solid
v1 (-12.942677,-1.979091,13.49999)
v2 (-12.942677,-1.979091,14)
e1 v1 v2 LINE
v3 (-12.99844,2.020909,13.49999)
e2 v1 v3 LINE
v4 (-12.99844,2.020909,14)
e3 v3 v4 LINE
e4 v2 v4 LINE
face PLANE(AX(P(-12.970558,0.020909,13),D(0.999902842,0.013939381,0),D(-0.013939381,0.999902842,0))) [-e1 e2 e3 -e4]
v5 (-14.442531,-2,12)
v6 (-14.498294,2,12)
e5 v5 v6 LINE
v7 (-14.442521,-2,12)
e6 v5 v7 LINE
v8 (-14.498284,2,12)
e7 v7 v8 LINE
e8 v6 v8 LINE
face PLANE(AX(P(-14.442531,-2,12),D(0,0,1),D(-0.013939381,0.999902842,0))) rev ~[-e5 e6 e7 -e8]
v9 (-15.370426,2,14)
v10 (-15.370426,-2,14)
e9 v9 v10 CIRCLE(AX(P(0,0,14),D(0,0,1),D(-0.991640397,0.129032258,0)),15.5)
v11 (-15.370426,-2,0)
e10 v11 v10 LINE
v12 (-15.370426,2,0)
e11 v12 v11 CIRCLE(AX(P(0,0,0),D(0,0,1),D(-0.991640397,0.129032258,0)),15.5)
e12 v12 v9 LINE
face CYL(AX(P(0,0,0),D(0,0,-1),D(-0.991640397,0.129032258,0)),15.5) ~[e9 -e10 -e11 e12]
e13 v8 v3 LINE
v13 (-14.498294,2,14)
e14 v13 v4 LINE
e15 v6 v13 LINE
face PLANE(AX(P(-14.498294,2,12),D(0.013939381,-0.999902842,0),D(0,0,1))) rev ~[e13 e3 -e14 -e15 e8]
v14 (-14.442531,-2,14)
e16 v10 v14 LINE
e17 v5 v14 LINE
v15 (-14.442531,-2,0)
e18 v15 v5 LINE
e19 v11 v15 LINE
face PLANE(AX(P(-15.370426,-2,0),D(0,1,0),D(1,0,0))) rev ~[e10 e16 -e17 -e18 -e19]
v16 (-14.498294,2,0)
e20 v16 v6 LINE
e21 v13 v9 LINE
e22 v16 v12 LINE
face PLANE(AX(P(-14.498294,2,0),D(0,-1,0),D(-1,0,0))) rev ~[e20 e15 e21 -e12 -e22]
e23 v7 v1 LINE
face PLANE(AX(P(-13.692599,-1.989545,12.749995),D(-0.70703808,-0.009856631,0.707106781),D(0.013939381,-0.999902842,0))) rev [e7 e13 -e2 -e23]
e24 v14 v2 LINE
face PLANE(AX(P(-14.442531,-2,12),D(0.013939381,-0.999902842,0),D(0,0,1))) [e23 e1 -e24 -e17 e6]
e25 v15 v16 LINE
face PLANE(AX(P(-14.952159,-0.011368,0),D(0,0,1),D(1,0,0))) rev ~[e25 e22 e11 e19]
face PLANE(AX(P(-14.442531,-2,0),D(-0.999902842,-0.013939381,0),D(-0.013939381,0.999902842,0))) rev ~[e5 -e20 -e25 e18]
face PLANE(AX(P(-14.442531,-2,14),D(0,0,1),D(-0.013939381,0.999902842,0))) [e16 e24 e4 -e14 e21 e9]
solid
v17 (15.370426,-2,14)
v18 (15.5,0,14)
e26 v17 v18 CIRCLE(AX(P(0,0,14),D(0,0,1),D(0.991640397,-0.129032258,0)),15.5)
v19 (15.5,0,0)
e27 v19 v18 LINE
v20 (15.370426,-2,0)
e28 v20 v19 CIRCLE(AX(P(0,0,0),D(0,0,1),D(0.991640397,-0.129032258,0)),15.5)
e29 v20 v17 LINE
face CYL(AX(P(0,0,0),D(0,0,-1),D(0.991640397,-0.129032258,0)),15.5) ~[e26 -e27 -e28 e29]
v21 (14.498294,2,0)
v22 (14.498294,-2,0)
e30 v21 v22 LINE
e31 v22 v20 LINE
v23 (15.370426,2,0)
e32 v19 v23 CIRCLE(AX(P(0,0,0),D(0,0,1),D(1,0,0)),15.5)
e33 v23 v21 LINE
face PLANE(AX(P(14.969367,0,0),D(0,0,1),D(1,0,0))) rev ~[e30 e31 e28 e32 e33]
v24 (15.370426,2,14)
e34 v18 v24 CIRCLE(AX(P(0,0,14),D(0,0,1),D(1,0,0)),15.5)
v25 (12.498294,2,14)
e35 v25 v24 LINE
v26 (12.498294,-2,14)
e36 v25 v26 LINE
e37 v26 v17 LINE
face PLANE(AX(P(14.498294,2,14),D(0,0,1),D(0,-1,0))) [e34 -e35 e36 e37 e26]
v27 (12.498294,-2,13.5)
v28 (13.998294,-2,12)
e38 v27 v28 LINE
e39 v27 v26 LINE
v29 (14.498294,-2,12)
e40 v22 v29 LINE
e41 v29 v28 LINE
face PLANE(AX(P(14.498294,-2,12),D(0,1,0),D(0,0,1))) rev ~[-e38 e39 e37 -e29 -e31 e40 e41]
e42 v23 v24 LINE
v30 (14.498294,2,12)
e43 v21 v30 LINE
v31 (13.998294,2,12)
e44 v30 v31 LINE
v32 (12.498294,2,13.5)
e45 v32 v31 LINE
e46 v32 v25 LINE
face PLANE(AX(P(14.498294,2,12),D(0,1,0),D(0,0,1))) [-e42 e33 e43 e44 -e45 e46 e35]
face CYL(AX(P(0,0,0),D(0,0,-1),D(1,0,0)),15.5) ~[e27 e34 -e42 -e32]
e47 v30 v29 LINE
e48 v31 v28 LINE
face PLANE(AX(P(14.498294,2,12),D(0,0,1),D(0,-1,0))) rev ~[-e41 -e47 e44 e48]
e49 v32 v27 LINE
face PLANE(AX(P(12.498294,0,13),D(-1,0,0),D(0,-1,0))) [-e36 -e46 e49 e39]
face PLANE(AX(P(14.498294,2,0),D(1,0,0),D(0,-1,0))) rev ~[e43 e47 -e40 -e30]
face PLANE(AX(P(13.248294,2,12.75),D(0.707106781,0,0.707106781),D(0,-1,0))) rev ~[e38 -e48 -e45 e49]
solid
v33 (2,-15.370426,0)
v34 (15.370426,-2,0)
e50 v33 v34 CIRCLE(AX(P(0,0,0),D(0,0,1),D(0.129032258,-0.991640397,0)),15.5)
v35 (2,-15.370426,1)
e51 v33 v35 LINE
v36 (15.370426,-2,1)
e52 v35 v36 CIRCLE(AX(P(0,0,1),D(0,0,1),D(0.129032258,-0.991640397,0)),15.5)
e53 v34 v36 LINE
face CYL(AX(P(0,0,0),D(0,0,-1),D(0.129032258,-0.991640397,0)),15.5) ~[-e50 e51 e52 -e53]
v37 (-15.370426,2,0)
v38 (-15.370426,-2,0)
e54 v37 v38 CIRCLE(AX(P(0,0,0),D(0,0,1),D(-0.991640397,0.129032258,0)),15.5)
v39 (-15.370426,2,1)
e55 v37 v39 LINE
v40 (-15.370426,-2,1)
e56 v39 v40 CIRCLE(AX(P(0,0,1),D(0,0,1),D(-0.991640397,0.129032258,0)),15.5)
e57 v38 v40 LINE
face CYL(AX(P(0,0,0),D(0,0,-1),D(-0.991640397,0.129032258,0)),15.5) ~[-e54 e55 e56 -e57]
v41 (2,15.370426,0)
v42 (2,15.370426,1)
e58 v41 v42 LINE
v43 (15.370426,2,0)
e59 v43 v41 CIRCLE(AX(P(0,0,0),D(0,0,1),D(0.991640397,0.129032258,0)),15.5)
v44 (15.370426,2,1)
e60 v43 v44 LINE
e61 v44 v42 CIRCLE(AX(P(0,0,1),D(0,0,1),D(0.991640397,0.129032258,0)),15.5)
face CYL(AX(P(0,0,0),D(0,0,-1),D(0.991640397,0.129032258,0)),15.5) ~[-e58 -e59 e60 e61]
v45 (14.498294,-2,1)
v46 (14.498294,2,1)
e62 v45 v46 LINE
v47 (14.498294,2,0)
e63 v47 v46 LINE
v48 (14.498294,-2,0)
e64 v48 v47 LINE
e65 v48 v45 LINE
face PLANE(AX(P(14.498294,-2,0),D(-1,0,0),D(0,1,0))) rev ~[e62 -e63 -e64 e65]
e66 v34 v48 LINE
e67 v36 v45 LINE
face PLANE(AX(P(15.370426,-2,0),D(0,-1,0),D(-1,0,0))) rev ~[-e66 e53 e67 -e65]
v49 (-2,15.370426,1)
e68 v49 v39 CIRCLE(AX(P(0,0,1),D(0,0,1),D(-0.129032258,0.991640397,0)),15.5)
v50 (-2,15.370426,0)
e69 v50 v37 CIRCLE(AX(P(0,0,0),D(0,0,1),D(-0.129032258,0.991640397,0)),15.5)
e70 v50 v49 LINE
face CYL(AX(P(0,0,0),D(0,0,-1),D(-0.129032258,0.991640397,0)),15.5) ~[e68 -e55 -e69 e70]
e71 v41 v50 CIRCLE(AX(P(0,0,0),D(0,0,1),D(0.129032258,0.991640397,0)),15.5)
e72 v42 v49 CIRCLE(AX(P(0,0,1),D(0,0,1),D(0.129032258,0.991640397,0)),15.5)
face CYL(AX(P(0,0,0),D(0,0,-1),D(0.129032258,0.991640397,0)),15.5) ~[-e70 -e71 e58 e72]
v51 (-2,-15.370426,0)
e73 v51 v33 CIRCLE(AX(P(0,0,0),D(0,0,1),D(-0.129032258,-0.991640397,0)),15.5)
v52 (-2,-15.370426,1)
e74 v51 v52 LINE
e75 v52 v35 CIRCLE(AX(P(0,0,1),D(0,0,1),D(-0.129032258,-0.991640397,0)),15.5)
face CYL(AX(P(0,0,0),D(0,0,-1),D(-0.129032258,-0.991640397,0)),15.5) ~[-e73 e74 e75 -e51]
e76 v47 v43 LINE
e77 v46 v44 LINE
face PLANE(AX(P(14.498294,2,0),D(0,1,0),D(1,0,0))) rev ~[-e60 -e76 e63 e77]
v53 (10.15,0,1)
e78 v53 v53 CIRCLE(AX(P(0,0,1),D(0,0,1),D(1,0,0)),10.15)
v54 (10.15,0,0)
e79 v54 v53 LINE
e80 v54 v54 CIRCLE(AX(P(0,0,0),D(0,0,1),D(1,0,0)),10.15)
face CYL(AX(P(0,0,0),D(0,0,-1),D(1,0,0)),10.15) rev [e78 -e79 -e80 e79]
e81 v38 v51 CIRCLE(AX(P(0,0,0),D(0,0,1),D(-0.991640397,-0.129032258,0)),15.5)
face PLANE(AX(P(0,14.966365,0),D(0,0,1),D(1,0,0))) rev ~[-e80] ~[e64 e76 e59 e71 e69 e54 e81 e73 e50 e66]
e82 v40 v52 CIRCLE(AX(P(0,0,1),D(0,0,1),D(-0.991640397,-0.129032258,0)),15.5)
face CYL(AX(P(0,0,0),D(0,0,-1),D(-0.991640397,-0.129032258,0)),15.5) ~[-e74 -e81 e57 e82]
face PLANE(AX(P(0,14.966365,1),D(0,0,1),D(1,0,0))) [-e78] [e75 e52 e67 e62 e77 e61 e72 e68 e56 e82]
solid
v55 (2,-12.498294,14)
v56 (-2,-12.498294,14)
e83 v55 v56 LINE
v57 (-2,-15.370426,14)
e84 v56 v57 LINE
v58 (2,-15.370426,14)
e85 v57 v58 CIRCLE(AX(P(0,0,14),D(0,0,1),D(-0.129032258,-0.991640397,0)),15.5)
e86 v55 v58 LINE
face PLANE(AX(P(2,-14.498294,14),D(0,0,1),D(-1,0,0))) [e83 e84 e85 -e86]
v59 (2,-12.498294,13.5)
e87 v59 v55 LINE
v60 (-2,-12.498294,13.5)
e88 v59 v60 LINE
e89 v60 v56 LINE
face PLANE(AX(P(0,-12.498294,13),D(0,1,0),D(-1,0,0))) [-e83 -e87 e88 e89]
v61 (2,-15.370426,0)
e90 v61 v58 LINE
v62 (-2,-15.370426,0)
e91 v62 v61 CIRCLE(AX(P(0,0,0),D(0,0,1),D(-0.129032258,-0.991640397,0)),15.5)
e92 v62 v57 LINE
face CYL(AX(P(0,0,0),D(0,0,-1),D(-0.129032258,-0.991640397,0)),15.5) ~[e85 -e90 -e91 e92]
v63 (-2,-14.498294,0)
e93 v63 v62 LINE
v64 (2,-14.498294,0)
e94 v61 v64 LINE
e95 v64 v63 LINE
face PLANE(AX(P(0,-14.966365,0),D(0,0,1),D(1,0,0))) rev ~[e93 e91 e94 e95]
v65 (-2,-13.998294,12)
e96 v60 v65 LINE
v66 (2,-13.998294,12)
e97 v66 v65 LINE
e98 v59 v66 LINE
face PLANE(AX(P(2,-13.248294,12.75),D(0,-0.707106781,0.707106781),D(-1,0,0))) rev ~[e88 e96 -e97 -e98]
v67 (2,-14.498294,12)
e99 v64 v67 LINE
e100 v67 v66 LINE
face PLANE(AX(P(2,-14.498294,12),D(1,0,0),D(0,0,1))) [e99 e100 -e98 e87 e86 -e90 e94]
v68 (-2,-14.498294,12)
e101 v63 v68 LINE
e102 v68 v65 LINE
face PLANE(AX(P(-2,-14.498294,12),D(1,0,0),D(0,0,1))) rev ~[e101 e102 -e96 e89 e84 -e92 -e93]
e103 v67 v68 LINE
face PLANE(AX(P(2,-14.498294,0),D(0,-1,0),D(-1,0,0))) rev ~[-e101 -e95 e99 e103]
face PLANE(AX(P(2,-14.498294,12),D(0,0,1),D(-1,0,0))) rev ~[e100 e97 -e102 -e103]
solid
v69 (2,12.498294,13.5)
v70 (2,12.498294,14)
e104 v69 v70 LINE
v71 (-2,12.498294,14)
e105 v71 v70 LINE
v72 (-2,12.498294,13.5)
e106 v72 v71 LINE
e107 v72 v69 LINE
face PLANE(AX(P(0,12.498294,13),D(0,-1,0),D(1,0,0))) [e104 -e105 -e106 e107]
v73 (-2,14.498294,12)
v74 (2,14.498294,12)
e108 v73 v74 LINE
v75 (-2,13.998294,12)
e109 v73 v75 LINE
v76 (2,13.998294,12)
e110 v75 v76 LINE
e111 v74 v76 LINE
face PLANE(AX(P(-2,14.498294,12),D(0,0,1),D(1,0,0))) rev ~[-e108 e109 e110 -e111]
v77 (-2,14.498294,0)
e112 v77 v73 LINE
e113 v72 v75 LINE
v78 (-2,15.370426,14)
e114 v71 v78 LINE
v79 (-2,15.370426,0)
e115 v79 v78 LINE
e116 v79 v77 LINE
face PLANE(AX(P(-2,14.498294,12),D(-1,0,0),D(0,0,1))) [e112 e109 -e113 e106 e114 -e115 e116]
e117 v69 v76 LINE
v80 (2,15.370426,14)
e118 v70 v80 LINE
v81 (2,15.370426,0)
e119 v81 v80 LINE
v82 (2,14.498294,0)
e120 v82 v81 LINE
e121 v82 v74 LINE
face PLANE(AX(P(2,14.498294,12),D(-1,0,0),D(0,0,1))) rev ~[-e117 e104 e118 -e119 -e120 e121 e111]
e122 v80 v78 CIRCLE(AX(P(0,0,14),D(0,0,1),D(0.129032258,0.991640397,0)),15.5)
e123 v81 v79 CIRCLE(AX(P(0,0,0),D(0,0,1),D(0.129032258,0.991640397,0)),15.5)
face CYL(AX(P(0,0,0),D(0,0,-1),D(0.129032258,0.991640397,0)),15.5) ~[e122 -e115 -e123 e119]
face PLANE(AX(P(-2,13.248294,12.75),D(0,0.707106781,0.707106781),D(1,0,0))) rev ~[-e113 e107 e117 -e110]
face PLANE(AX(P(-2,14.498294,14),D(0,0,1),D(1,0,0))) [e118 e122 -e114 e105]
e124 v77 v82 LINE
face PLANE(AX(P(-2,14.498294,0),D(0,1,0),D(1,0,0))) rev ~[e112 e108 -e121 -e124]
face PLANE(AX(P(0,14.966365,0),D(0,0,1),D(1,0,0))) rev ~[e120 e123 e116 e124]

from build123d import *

# Parameters (mm, degrees)
F1_DEPTH  = 14
F0_R      = 10.15
F2_DEPTH  = 1
F3_W      = 4
F3_H      = 2
F4_DEPTH  = 2
F5_SIZE   = 1.5
F6_W      = 4
F6_H      = 2
F7_DEPTH  = 2
F8_SIZE   = 1.5
F9_W      = 4.0003886693
F9_H      = 2
F10_DEPTH = 1.5
F11_SIZE  = 1.49999
F12_W     = 4
F12_H     = 2
F13_DEPTH = 2
F14_SIZE  = 1.5


# Not quite as in the source:
# - a fillet or chamfer is up to 0.001 mm smaller than in the source, because OpenCascade refuses the exact size
# - a feature names something its author has since deleted; it is built from what else it names


with BuildPart() as f1:
    # F0 (on Top) → F1 (new body)
    with BuildSketch(Plane.XY):
        with BuildLine():
            Line((-14.4982938511, 2), (-15.3704261489, 2))
            ThreePointArc((-15.3704261489, 2), (-15.5, 0), (-15.3704261489, -2))
            Line((-15.3704261489, -2), (-14.4425309095, -2))
            Line((-14.4425309095, -2), (-14.4982938511, 2))
        make_face()
    extrude(amount=F1_DEPTH)

    # F9 (on face) → F10 (join)
    with BuildSketch(Plane(origin=(-14.4676006874, -0.2016889929, 0), x_dir=(-0.0139393809, 0.9999028421, 0), z_dir=(0.9999028421, 0.0139393809, 0))):
        with Locations((0.2017085905, 13)):
            Rectangle(F9_W, F9_H)
    extrude(amount=F10_DEPTH)

    # F11 (size 1.5 in the source; OpenCascade refuses exactly that, so slightly less here)
    f11_edges = [f1.edges().sort_by_distance(p)[0] for p in [
        (-12.970558, 0.020909, 12),
    ]]
    chamfer(f11_edges, length=F11_SIZE)


with BuildPart() as f1b:
    # F0 (on Top) → F1, piece 2 (new body)
    with BuildSketch(Plane.XY):
        with BuildLine():
            ThreePointArc((-2, -15.3704261489), (0, -15.5), (2, -15.3704261489))
            Line((2, -15.3704261489), (2, -14.4982938511))
            Line((2, -14.4982938511), (-2, -14.4982938511))
            Line((-2, -14.4982938511), (-2, -15.3704261489))
        make_face()
    extrude(amount=F1_DEPTH)

    # F3 (on face) → F4 (join)
    with BuildSketch(Plane(origin=(0, -14.4982938511, 0), x_dir=(-1, 0, 0), z_dir=(0, 1, 0))):
        with Locations((0, 13)):
            Rectangle(F3_W, F3_H)
    extrude(amount=F4_DEPTH)

    # F5
    f5_edges = [f1b.edges().sort_by_distance(p)[0] for p in [
        (0, -12.498294, 12),
    ]]
    chamfer(f5_edges, length=F5_SIZE)


with BuildPart() as f1c:
    # F0 (on Top) → F1, piece 3 (new body)
    with BuildSketch(Plane.XY):
        with BuildLine():
            Line((2, 14.4982938511), (2, 15.3704261489))
            ThreePointArc((2, 15.3704261489), (0, 15.5), (-2, 15.3704261489))
            Line((-2, 15.3704261489), (-2, 14.4982938511))
            Line((-2, 14.4982938511), (2, 14.4982938511))
        make_face()
    extrude(amount=F1_DEPTH)

    # F6 (on face) → F7 (join)
    with BuildSketch(Plane.XZ.offset(-14.4982938511)):
        with Locations((0, 13)):
            Rectangle(F6_W, F6_H)
    extrude(amount=F7_DEPTH)

    # F8
    f8_edges = [f1c.edges().sort_by_distance(p)[0] for p in [
        (0, 12.498294, 12),
    ]]
    chamfer(f8_edges, length=F8_SIZE)


with BuildPart() as f1d:
    # F0 (on Top) → F1, piece 4 (new body)
    with BuildSketch(Plane.XY):
        with BuildLine():
            ThreePointArc((15.3704261489, -2), (15.4675726167, -1.0020964753), (15.5, 0))
            ThreePointArc((15.5, 0), (15.4675726167, 1.0020964753), (15.3704261489, 2))
            Line((15.3704261489, 2), (14.4982938511, 2))
            Line((14.4982938511, 2), (14.4982938511, -2))
            Line((14.4982938511, -2), (15.3704261489, -2))
        make_face()
    extrude(amount=F1_DEPTH)

    # F12 (on face) → F13 (join)
    with BuildSketch(Plane(origin=(14.4982938511, 0, 0), x_dir=(0, -1, 0), z_dir=(-1, 0, 0))):
        with Locations((0, 13)):
            Rectangle(F12_W, F12_H)
    extrude(amount=F13_DEPTH)

    # F14
    f14_edges = [f1d.edges().sort_by_distance(p)[0] for p in [
        (12.498294, 0, 12),
    ]]
    chamfer(f14_edges, length=F14_SIZE)


with BuildPart() as f2:
    # F0 (on Top) → F2 (new body)
    with BuildSketch(Plane.XY):
        with BuildLine():
            Line((2, 14.4982938511), (2, 15.3704261489))
            ThreePointArc((2, 15.3704261489), (0, 15.5), (-2, 15.3704261489))
            Line((-2, 15.3704261489), (-2, 14.4982938511))
            Line((-2, 14.4982938511), (2, 14.4982938511))
        make_face()
        with BuildLine():
            Line((-14.4982938511, 2), (-15.3704261489, 2))
            ThreePointArc((-15.3704261489, 2), (-15.5, 0), (-15.3704261489, -2))
            Line((-15.3704261489, -2), (-14.4425309095, -2))
            Line((-14.4425309095, -2), (-14.4982938511, 2))
        make_face()
        with BuildLine():
            Line((14.4982938511, 2), (15.3704261489, 2))
            ThreePointArc((15.3704261489, 2), (10.9601551084, 10.9601551084), (2, 15.3704261489))
            Line((2, 15.3704261489), (2, 14.4982938511))
            Line((2, 14.4982938511), (-2, 14.4982938511))
            Line((-2, 14.4982938511), (-2, 15.3704261489))
            ThreePointArc((-2, 15.3704261489), (-10.9601551084, 10.9601551084), (-15.3704261489, 2))
            Line((-15.3704261489, 2), (-14.4982938511, 2))
            Line((-14.4982938511, 2), (-14.4425309095, -2))
            Line((-14.4425309095, -2), (-15.3704261489, -2))
            ThreePointArc((-15.3704261489, -2), (-10.9601551084, -10.9601551084), (-2, -15.3704261489))
            Line((-2, -15.3704261489), (-2, -14.4982938511))
            Line((-2, -14.4982938511), (2, -14.4982938511))
            Line((2, -14.4982938511), (2, -15.3704261489))
            ThreePointArc((2, -15.3704261489), (10.9601551084, -10.9601551084), (15.3704261489, -2))
            Line((15.3704261489, -2), (14.4982938511, -2))
            Line((14.4982938511, -2), (14.4982938511, 2))
        make_face()
        Circle(F0_R, mode=Mode.SUBTRACT)
        with BuildLine():
            ThreePointArc((-2, -15.3704261489), (0, -15.5), (2, -15.3704261489))
            Line((2, -15.3704261489), (2, -14.4982938511))
            Line((2, -14.4982938511), (-2, -14.4982938511))
            Line((-2, -14.4982938511), (-2, -15.3704261489))
        make_face()
    extrude(amount=F2_DEPTH)


solid = Compound([f1.part, f1b.part, f1c.part, f1d.part, f2.part])
